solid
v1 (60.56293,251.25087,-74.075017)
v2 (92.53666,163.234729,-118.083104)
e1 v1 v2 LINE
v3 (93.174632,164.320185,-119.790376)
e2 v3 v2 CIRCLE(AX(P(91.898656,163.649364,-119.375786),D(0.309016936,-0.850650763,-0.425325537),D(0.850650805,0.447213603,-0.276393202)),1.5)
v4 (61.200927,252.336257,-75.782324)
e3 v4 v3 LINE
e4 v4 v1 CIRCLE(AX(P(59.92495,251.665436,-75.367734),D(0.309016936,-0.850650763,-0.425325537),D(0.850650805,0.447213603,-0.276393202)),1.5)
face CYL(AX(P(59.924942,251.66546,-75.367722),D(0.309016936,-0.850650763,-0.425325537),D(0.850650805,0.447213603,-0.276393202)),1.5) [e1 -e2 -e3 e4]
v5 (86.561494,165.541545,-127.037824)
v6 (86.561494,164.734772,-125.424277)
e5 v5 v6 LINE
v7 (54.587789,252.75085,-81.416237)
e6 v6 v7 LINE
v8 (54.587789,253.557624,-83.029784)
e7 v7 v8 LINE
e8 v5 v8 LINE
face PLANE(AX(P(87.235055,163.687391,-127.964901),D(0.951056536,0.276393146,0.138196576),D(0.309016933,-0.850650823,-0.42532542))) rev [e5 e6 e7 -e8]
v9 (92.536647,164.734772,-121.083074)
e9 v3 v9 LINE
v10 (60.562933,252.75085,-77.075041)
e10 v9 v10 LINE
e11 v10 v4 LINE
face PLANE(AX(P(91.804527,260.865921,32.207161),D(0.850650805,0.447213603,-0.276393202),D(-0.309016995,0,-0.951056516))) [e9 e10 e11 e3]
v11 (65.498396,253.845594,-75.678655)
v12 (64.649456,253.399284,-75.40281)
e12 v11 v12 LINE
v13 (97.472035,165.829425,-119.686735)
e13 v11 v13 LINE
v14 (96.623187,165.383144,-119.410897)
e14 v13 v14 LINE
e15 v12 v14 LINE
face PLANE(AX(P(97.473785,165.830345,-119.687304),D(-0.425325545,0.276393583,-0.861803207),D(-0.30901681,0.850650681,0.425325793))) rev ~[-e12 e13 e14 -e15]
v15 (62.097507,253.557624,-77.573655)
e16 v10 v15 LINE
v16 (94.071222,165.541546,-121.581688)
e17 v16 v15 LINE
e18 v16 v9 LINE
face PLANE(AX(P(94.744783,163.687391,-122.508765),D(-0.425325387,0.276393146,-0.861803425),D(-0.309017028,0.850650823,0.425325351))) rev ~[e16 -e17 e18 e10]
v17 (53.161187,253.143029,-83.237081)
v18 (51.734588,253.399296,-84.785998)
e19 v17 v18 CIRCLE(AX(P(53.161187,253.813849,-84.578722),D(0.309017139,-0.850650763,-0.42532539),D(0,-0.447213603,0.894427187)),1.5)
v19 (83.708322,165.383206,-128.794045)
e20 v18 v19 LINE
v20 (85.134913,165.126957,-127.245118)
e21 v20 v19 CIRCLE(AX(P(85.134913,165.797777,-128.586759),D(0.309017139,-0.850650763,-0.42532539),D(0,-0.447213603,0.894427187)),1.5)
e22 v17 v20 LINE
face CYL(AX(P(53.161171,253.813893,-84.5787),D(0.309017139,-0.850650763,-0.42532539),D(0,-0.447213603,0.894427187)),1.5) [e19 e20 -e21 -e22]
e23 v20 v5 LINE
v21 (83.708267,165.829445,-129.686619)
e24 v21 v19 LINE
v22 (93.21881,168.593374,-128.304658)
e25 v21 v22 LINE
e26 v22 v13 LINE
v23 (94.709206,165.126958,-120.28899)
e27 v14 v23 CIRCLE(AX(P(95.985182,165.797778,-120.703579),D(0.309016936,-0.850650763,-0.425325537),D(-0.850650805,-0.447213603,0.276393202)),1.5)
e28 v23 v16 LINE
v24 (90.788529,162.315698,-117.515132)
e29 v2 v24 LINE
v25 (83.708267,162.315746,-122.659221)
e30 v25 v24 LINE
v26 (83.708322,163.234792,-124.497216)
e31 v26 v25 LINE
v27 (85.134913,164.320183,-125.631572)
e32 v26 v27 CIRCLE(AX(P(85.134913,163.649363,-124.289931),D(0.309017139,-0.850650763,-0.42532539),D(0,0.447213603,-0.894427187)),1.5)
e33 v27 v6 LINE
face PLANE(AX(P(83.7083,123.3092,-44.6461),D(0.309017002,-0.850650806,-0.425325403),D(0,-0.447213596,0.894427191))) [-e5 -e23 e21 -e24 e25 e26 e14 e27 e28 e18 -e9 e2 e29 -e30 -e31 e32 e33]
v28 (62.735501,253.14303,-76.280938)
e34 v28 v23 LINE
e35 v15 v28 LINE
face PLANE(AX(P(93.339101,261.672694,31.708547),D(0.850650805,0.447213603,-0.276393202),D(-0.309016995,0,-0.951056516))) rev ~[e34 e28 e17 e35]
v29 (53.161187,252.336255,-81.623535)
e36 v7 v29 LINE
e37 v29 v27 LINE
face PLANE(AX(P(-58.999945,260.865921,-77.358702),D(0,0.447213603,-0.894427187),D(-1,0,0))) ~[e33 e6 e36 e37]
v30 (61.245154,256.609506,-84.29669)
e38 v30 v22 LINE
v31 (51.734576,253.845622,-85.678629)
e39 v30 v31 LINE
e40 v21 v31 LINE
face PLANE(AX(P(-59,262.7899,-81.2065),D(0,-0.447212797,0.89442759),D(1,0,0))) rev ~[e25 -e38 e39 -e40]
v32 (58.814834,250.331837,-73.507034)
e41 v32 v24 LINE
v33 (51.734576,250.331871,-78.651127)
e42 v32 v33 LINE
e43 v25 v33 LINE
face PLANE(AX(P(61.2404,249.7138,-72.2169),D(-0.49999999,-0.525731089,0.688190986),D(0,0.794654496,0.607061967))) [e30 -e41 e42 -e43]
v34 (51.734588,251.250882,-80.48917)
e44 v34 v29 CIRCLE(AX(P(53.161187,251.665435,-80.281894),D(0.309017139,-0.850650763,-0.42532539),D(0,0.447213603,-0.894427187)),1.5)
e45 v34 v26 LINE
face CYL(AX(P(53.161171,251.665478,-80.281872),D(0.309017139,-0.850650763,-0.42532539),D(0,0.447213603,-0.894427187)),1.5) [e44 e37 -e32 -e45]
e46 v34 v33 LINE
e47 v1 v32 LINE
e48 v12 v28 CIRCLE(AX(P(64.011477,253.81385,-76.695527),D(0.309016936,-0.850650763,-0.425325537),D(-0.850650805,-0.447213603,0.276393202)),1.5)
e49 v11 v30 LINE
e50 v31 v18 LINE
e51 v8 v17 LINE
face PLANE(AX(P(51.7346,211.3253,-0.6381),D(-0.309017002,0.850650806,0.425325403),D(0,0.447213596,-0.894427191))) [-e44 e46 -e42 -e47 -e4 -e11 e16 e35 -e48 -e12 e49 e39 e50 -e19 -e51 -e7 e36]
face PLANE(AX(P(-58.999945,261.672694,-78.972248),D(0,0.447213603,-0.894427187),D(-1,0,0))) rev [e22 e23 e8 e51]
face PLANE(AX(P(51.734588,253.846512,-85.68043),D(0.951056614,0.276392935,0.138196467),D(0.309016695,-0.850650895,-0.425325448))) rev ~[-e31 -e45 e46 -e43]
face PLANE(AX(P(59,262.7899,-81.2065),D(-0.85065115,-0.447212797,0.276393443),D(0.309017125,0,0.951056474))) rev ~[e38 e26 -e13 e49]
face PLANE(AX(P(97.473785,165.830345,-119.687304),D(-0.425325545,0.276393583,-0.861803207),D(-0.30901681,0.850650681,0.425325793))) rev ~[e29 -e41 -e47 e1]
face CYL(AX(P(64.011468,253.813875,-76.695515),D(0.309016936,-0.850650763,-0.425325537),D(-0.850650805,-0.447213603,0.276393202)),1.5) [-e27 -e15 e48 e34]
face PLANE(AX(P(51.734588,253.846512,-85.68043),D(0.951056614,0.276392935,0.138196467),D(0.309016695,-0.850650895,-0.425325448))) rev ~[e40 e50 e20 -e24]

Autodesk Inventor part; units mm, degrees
sketch "Boceto2" plane through (0, 0, 0) normal (0, 1, 0) x (-1, 0, 0)
  line L0 (0, -100.3768) -> (-95.464, -31.0181)
  line L1 (-95.464, -31.0181) -> (-59, 81.2065)
  line L2 (-59, 81.2065) -> (59, 81.2065)
  line L3 (59, 81.2065) -> (95.464, -31.0181)
  line L4 (95.464, -31.0181) -> (0, -100.3768)
  line L5 (0, 0) -> (162.4131, 0) construction
  line L6 (162.4131, 0) -> (162.4131, 162.4131) construction
  line L7 (162.4131, 162.4131) -> (0, 162.4131) construction
  line L8 (0, 162.4131) -> (0, 0) construction
  line L9 (162.4131, 162.4131) -> (0, 81.2065) construction
  dimension "Lado" = 118
  dimension "d1" = 26.565
  dimension "d2" = 262.7899
extrude "Extrusión1" add sketch "Boceto2" along normal blind 262.7899 draft 26.565
sketch "Boceto3" plane through (0, 262.7899, 0) normal (0, 1, 0) x (1, 0, 0)
  line L0 (0, -100.3768) -> (-95.464, -31.0181)
  line L1 (-95.464, -31.0181) -> (-59, 81.2065)
  line L2 (-59, 81.2065) -> (59, 81.2065)
  line L3 (59, 81.2065) -> (95.464, -31.0181)
  line L4 (95.464, -31.0181) -> (0, -100.3768)
  point P0 (0, 0)
  point P1 (0, 0)
  dimension "d5" = 118
extrude "Extrusión2" cut sketch "Boceto3" against normal blind 262.7899 draft 26.565 keep common part
sketch "Boceto4" plane through (-95.464, 262.7899, 31.0181) normal (-0.5257311, 0.4472136, 0.7236068) x (0.809017, 0, 0.5877853)
  line L0 (-36.464, -112.2247) -> (59, -181.5833) projected
  line L1 (59, -181.5833) -> (154.464, -112.2247) projected
  line L2 (118, 0) -> (154.464, -112.2247) projected
  line L3 (118, 0) -> (0, 0) projected
  line L4 (0, 0) -> (-36.464, -112.2247) projected
  line L5 (59, -167.9866) -> (-23.5327, -108.023)
  line L6 (-23.5327, -108.023) -> (7.992, -11)
  line L7 (7.992, -11) -> (110.008, -11)
  line L8 (110.008, -11) -> (141.5327, -108.023)
  line L9 (141.5327, -108.023) -> (59, -167.9866)
  point P0 (59, -198.7297)
  dimension "Ancho_Marco" = 11
extrude "Extrusión3" cut sketch "Boceto4" against normal blind 162.7899 contours L5 L6 L7 L8 L9
sketch "Boceto5" plane through (-59, 0, 81.2065) normal (0, -0.4472136, 0.8944272) x (1, 0, 0)
  line L0 (-36.464, 112.2247) -> (59, 181.5833) projected
  line L1 (0, 0) -> (-36.464, 112.2247) projected
  line L2 (0, 0) -> (118, 0) projected
  line L3 (118, 0) -> (154.464, 112.2247) projected
  line L4 (59, 181.5833) -> (154.464, 112.2247) projected
  line L5 (-23.5327, 108.023) -> (59, 167.9866)
  line L6 (59, 167.9866) -> (141.5327, 108.023)
  line L7 (141.5327, 108.023) -> (110.008, 11)
  line L8 (110.008, 11) -> (7.992, 11)
  line L9 (7.992, 11) -> (-23.5327, 108.023)
  point P0 (59, -36.3167)
  dimension "d11" = 11
sketch "Boceto6" plane through (-95.464, 0, -31.0181) normal (-0.8506508, -0.4472136, 0.2763932) x (0.309017, 0, 0.9510565)
  line L0 (-36.464, 112.2247) -> (59, 181.5833) projected
  line L1 (0, 0) -> (-36.464, 112.2247) projected
  line L2 (0, 0) -> (118, 0) projected
  line L3 (118, 0) -> (154.464, 112.2247) projected
  line L4 (59, 181.5833) -> (154.464, 112.2247) projected
  line L5 (-23.5327, 108.023) -> (59, 167.9866)
  line L6 (59, 167.9866) -> (141.5327, 108.023)
  line L7 (141.5327, 108.023) -> (110.008, 11)
  line L8 (110.008, 11) -> (7.992, 11)
  line L9 (7.992, 11) -> (-23.5327, 108.023)
  point P0 (59, -36.3167)
  dimension "d12" = 11
sketch "Boceto7" plane through (-59, 262.7899, -81.2065) normal (-0.8506508, 0.4472136, -0.2763932) x (-0.309017, 0, 0.9510565)
  line L0 (-36.464, -112.2247) -> (59, -181.5833) projected
  line L1 (59, -181.5833) -> (154.464, -112.2247) projected
  line L2 (118, 0) -> (154.464, -112.2247) projected
  line L3 (118, 0) -> (0, 0) projected
  line L4 (0, 0) -> (-36.464, -112.2247) projected
  line L5 (59, -167.9866) -> (-23.5327, -108.023)
  line L6 (-23.5327, -108.023) -> (7.992, -11)
  line L7 (7.992, -11) -> (110.008, -11)
  line L8 (110.008, -11) -> (141.5327, -108.023)
  line L9 (141.5327, -108.023) -> (59, -167.9866)
  point P0 (59, -198.7297)
  dimension "d13" = 11
sketch "Boceto8" plane through (0, 262.7899, 0) normal (0, 1, 0) x (1, 0, 0)
  line L0 (-59, 81.2065) -> (59, 81.2065) projected
  line L1 (-95.464, -31.0181) -> (-59, 81.2065) projected
  line L2 (0, -100.3768) -> (-95.464, -31.0181) projected
  line L3 (95.464, -31.0181) -> (0, -100.3768) projected
  line L4 (59, 81.2065) -> (95.464, -31.0181) projected
  line L5 (-82.5327, -26.8165) -> (-51.008, 70.2065)
  line L6 (-51.008, 70.2065) -> (51.008, 70.2065)
  line L7 (51.008, 70.2065) -> (82.5327, -26.8165)
  line L8 (82.5327, -26.8165) -> (0, -86.78)
  line L9 (0, -86.78) -> (-82.5327, -26.8165)
  point P0 (0, 0)
  dimension "d14" = 11
sketch "Boceto9" plane through (0, 262.7899, 100.3768) normal (0.5257311, 0.4472136, 0.7236068) x (0.809017, 0, -0.5877853)
  line L0 (-36.464, -112.2247) -> (59, -181.5833) projected
  line L1 (59, -181.5833) -> (154.464, -112.2247) projected
  line L2 (118, 0) -> (154.464, -112.2247) projected
  line L3 (118, 0) -> (0, 0) projected
  line L4 (0, 0) -> (-36.464, -112.2247) projected
  line L5 (7.992, -11) -> (110.008, -11)
  line L6 (110.008, -11) -> (141.5327, -108.023)
  line L7 (141.5327, -108.023) -> (59, -167.9866)
  line L8 (59, -167.9866) -> (-23.5327, -108.023)
  line L9 (-23.5327, -108.023) -> (7.992, -11)
  point P0 (59, -198.7297)
  dimension "d15" = 11
extrude "Extrusión4" cut sketch "Boceto7" against normal blind 162.7899 contours L5 L6 L7 L8 L9
extrude "Extrusión5" cut sketch "Boceto8" against normal blind 162.7899 contours L5 L6 L7 L8 L9
extrude "Extrusión6" cut sketch "Boceto9" against normal blind 162.7899 contours L5 L6 L7 L8 L9
extrude "Extrusión7" cut sketch "Boceto5" against normal blind 162.7899 contours L5 L6 L7 L8 L9
extrude "Extrusión8" cut sketch "Boceto6" against normal blind 162.7899 contours L5 L6 L7 L8 L9
sketch "Boceto10" plane through (59, 0, 81.2065) normal (0.8506508, -0.4472136, 0.2763932) x (0.309017, 0, -0.9510565)
  line L0 (59, 181.5833) -> (154.464, 112.2247) projected
  line L1 (-36.464, 112.2247) -> (59, 181.5833) projected
  line L2 (0, 0) -> (-36.464, 112.2247) projected
  line L3 (0, 0) -> (118, 0) projected
  line L4 (118, 0) -> (154.464, 112.2247) projected
  line L5 (-23.5327, 108.023) -> (59, 167.9866)
  line L6 (59, 167.9866) -> (141.5327, 108.023)
  line L7 (141.5327, 108.023) -> (110.008, 11)
  line L8 (110.008, 11) -> (7.992, 11)
  line L9 (7.992, 11) -> (-23.5327, 108.023)
  point P0 (59, -36.3167)
  dimension "d26" = 11
sketch "Boceto11" plane through (0, 0, 0) normal (0, -1, 0) x (1, 0, 0)
  line L0 (-59, 81.2065) -> (59, 81.2065) projected
  line L1 (-82.5327, 26.8165) -> (0, 86.78) projected
  line L2 (-95.464, -31.0181) -> (-59, 81.2065) projected
  line L3 (0, -100.3768) -> (-95.464, -31.0181) projected
  line L4 (95.464, -31.0181) -> (0, -100.3768) projected
  line L5 (59, 81.2065) -> (95.464, -31.0181) projected
  line L6 (-59, 81.2065) -> (59, 81.2065) projected
  line L7 (-51.008, 70.2065) -> (-82.5327, -26.8165)
  line L8 (-82.5327, -26.8165) -> (0, -86.78)
  line L9 (0, -86.78) -> (82.5327, -26.8165)
  line L10 (82.5327, -26.8165) -> (51.008, 70.2065)
  line L11 (51.008, 70.2065) -> (-51.008, 70.2065)
  point P0 (0, 0)
  point P1 (-22.8115, 70.2065)
  point P2 (-59.7212, 43.39)
  dimension "d27" = 11
sketch "Boceto12" plane through (0, 0, -100.3768) normal (-0.5257311, -0.4472136, -0.7236068) x (-0.809017, 0, 0.5877853)
  line L0 (78.4833, 87.5371) -> (69.2036, 84.5219) projected
  line L1 (59, 181.5833) -> (154.464, 112.2247) projected
  line L2 (-36.464, 112.2247) -> (59, 181.5833) projected
  line L3 (0, 0) -> (-36.464, 112.2247) projected
  line L4 (0, 0) -> (118, 0) projected
  line L5 (118, 0) -> (154.464, 112.2247) projected
  line L6 (141.5327, 108.023) -> (59, 167.9866)
  line L7 (59, 167.9866) -> (-23.5327, 108.023)
  line L8 (-23.5327, 108.023) -> (7.992, 11)
  line L9 (7.992, 11) -> (110.008, 11)
  line L10 (110.008, 11) -> (141.5327, 108.023)
  point P0 (59, -36.3167)
  point P1 (59, 91.9353)
  point P2 (69, 94.9704)
  point P3 (69.2036, 84.5219)
  dimension "d28" = 11
sketch "Boceto13" plane through (59, 262.7899, -81.2065) normal (0, 0.4472136, -0.8944272) x (-1, 0, 0)
  line L0 (59, -181.5833) -> (154.464, -112.2247) projected
  line L1 (118, 0) -> (154.464, -112.2247) projected
  line L2 (118, 0) -> (0, 0) projected
  line L3 (0, 0) -> (-36.464, -112.2247) projected
  line L4 (-36.464, -112.2247) -> (59, -181.5833) projected
  line L5 (141.5327, -108.023) -> (59, -167.9866)
  line L6 (59, -167.9866) -> (-23.5327, -108.023)
  line L7 (-23.5327, -108.023) -> (7.992, -11)
  line L8 (7.992, -11) -> (110.008, -11)
  line L9 (110.008, -11) -> (141.5327, -108.023)
  point P0 (59, -198.7297)
  dimension "d29" = 11
sketch "Boceto14" plane through (95.464, 262.7899, 31.0181) normal (0.8506508, 0.4472136, -0.2763932) x (-0.309017, 0, -0.9510565)
  line L0 (59, -181.5833) -> (154.464, -112.2247) projected
  line L1 (118, 0) -> (154.464, -112.2247) projected
  line L2 (118, 0) -> (0, 0) projected
  line L3 (0, 0) -> (-36.464, -112.2247) projected
  line L4 (-36.464, -112.2247) -> (59, -181.5833) projected
  line L5 (141.5327, -108.023) -> (59, -167.9866)
  line L6 (59, -167.9866) -> (-23.5327, -108.023)
  line L7 (-23.5327, -108.023) -> (7.992, -11)
  line L8 (7.992, -11) -> (110.008, -11)
  line L9 (110.008, -11) -> (141.5327, -108.023)
  point P0 (59, -198.7297)
  dimension "d30" = 11
sketch "Boceto15" plane through (95.464, 0, -31.0181) normal (0.5257311, -0.4472136, -0.7236068) x (-0.809017, 0, -0.5877853)
  line L0 (59, 181.5833) -> (154.464, 112.2247) projected
  line L1 (-36.464, 112.2247) -> (59, 181.5833) projected
  line L2 (0, 0) -> (-36.464, 112.2247) projected
  line L3 (0, 0) -> (118, 0) projected
  line L4 (118, 0) -> (154.464, 112.2247) projected
  line L5 (141.5327, 108.023) -> (59, 167.9866)
  line L6 (59, 167.9866) -> (-23.5327, 108.023)
  line L7 (-23.5327, 108.023) -> (7.992, 11)
  line L8 (7.992, 11) -> (110.008, 11)
  line L9 (110.008, 11) -> (141.5327, 108.023)
  point P0 (59, -36.3167)
  dimension "d31" = 11
extrude "Extrusión9" cut sketch "Boceto13" against normal blind 162.7899 contours L5 L6 L7 L8 L9
extrude "Extrusión10" cut sketch "Boceto15" against normal blind 162.7899 contours L9 L8 L7 L6 L5
extrude "Extrusión11" cut sketch "Boceto14" against normal blind 162.7899 contours L5 L6 L7 L8 L9
extrude "Extrusión12" cut sketch "Boceto12" against normal blind 162.7899 contours L10 L9 L8 L7 L6
extrude "Extrusión13" cut sketch "Boceto11" against normal blind 162.7899 contours L11 L10 L9 L8 L7 L1 | L1 L7 L11
extrude "Extrusión14" cut sketch "Boceto10" against normal blind 162.7899 contours L5 L6 L7 L8 L9
ref_plane "Plano de trabajo1" through (93.3374, 261.6718, 31.7091) normal (0.8506508, 0.4472136, -0.2763932) x (-0.309017, 0, -0.9510565)
sketch "Boceto17" plane through (93.3374, 261.6718, 31.7091) normal (0.8506508, 0.4472136, -0.2763932) x (-0.309017, 0, -0.9510565)
  line L0 (-23.5327, -108.023) -> (7.992, -11) projected
  line L1 (7.992, -11) -> (110.008, -11) projected
  line L2 (110.008, -11) -> (141.5327, -108.023) projected
  line L3 (141.5327, -108.023) -> (59, -167.9866) projected
  line L4 (59, -167.9866) -> (-23.5327, -108.023) projected
  line L5 (59, -181.5833) -> (154.464, -112.2247) projected
  line L6 (118, 0) -> (154.464, -112.2247) projected
  line L7 (118, 0) -> (0, 0) projected
  line L8 (0, 0) -> (-36.464, -112.2247) projected
  line L9 (-36.464, -112.2247) -> (59, -181.5833) projected
  line L10 (59, -172.9309) -> (146.235, -109.5509)
  line L11 (146.235, -109.5509) -> (112.9142, -7)
  line L12 (112.9142, -7) -> (5.0858, -7)
  line L13 (5.0858, -7) -> (-28.235, -109.5509)
  line L14 (-28.235, -109.5509) -> (59, -172.9309)
  point P0 (59, -198.7297)
  dimension "d48" = 4
extrude "Extrusión15" cut sketch "Boceto17" against normal blind 1.8 contours L14 L13 L12 L11 L10
ref_plane "Plano de trabajo4" through (61.2404, 249.7138, -72.2169) normal (0.5, 0.5257311, -0.688191) x (0.309017, -0.8506508, -0.4253254)
ref_plane "Plano de trabajo3" through (62.4904, 251.0281, -73.9374) normal (0.5, 0.5257311, -0.688191) x (0.309017, -0.8506508, -0.4253254)
ref_plane "Plano de trabajo5" through (97.6729, 166.1711, -118.5159) normal (0.5, -0.8506508, 0.1624598) x (-0.8506508, -0.4472136, 0.2763932)
ref_plane "Plano de trabajo6" through (82.5327, 166.1711, -129.5159) normal (-0.309017, -0.8506508, -0.4253254) x (0, -0.4472136, 0.8944272)
split "Dividir2" plane through (97.6729, 166.1711, -118.5159) removes the side toward (0.5, -0.8506508, 0.1624598)
split "Dividir3" plane through (82.5327, 166.1711, -129.5159) removes the side toward (-0.309017, -0.8506508, -0.4253254)
ref_plane "Plano de trabajo7" through (66.1482, 252.9512, -75.1259) normal (0, 0.5257311, 0.8506508) x (-0.8506508, -0.4472136, 0.2763932)
ref_plane "Plano de trabajo8" through (51.008, 252.9512, -86.1259) normal (-0.809017, 0.5257311, 0.2628656) x (0, -0.4472136, 0.8944272)
split "Dividir4" plane through (66.1482, 252.9512, -75.1259) removes the side toward (0, 0.5257311, 0.8506508)
split "Dividir5" plane through (51.008, 252.9512, -86.1259) removes the side toward (-0.809017, 0.5257311, 0.2628656)
split "Dividir6" plane through (61.2404, 249.7138, -72.2169) removes the side toward (-0.5, -0.5257311, 0.688191)
ref_plane "Plano de trabajo9" through (-14.2309, 126.771, 19.5872) normal (-0.809017, 0, -0.5877853) x (0.5773503, 0.1875925, -0.7946545)
mirror "Simetría1" about plane through (-14.2309, 126.771, 19.5872) normal (-0.809017, 0, -0.5877853) of "Extrusión15"
sketch "Boceto19" plane through (91.5151, 162.9338, -116.5151) normal (-0.5, -0.5257311, 0.688191) x (0.809017, 0, 0.5877853)
  line L0 (-5.5514, -3.431) -> (-11.1029, 0) projected
  line L1 (0, 0) -> (-5.5514, -3.431) projected
  line L2 (0, 102.0161) -> (0, 0) projected
  line L3 (-5.5514, 105.447) -> (0, 102.0161) projected
  line L4 (-11.1029, 102.0161) -> (-5.5514, 105.447) projected
  line L5 (-11.1029, 0) -> (-11.1029, 102.0161) projected
  point P0 (-5.5514, -60.7632)
  dimension "d54" = 11.1029
  dimension "d55" = 102.0161
sketch "Boceto20" plane through (91.8062, 260.8668, 32.2066) normal (0.8506508, 0.4472136, -0.2763932) x (-0.309017, 0, -0.9510565)
  line L0 (112.9142, -7) -> (110.008, -11) projected
  line L1 (141.5327, -108.023) -> (110.008, -11) projected
  line L2 (141.5327, -108.023) -> (146.235, -109.5509) projected
  line L3 (112.9142, -7) -> (146.235, -109.5509) projected
  point P0 (59, -198.7297)
fillet "Empalme1" radius 1 4 edges at (79.7857, 208.444, -96.1305) (78.2511, 207.6372, -95.6319) (66.7704, 208.444, -105.5866) (66.7704, 207.6372, -103.9731)
sketch "Boceto21" plane through (95.464, 162.4131, -131.3949) normal (0, 0.4472136, -0.8944272) x (-0.9510565, 0.2763932, 0.1381966)
  line L0 (69.3587, 95.464) -> (0, 0) projected
  line L1 (73.5603, 82.5327) -> (69.3587, 95.464) projected
  line L2 (69.3587, 95.464) -> (0, 0) projected
  line L3 (0, 0) -> (13.5967, 0) projected
  line L4 (13.5967, 0) -> (73.5603, 82.5327) projected
  line L5 (13.5967, 0) -> (7.992, 11)
  line L6 (13.5967, 0) -> (25.9423, 0) construction
  point P0 (64.0601, -111.7712)
  dimension "d63" = 126
  dimension "d64" = 117
sketch "Boceto22" plane through (97.6729, 166.1711, -118.5159) normal (0.8506508, 0.4472136, -0.2763932) x (-0.1624598, -0.2763932, -0.9472136)
  line L0 (-55.7619, 95.464) -> (-59.9635, 82.5327) projected
  line L1 (-59.9635, 82.5327) -> (0, 0) projected
  line L2 (0, 0) -> (13.5967, 0) projected
  line L3 (-55.7619, 95.464) -> (13.5967, 0) projected
  line L4 (-59.9635, 82.5327) -> (0, 0) projected
  line L5 (1.2361, 0) -> (-59.5816, 83.7083) projected
  point P0 (-50.4634, -111.7712)
  dimension "d65" = 11
sketch "Boceto23" plane through (93.2119, 162.8815, -122.0107) normal (0.5, -0.8506508, 0.1624598) x (0.8506508, 0.4472136, -0.2763932)
  ellipse E0 centre (-1, 3.7082) end of major axis (-1, 4.9443) minor radius 1 (0, 3.7082) -> (-1, 4.9443) ccw projected
  line L0 (-1, 4.9443) -> (-2.9389, 4.9443) projected
  line L1 (-2.9389, 4.9443) -> (-5.8575, -0.8928) projected
  line L2 (-5.8575, -0.8928) -> (4.3, -8.6525) projected
  line L3 (4.3, 4.9443) -> (4.3, -8.6525) projected
  line L4 (4.3, 4.9443) -> (2.8, 4.9443) projected
  ellipse E1 centre (2.8, 3.7082) end of major axis (2.8, 4.9443) minor radius 1 (2.8, 4.9443) -> (1.8, 3.7082) ccw projected
  line L5 (1.8, 0) -> (1.8, 3.7082) projected
  line L6 (1.8, 0) -> (0, 0) projected
  line L7 (0, 3.7082) -> (0, 0) projected
  line L8 (1.8, 0) -> (1.8, 4.9443)
  point P0 (-185.8565, 55.4077)
  dimension "d67" = 4.9443
extrude "Extrusión16" cut sketch "Boceto22" against normal blind 10 contours L5 L2 L1 L0
sketch "Boceto24" plane through (95.464, 162.4131, -131.3949) normal (0, 0.4472136, -0.8944272) x (-0.9510565, 0.2763932, 0.1381966)
  line L0 (73.5603, 82.5327) -> (69.3587, 95.464) projected
  line L1 (69.3587, 95.464) -> (0, 0) projected
  line L2 (0, 0) -> (13.5967, 0) projected
  line L3 (13.5967, 0) -> (73.5603, 82.5327) projected
  line L4 (13.5967, 0) -> (73.5603, 82.5327) projected
  line L5 (13.5967, 0) -> (73.5603, 82.5327) projected
  line L6 (73.1783, 83.7083) -> (12.3607, 0) projected
  point P0 (64.0601, -111.7712)
extrude "Extrusión17" cut sketch "Boceto24" against normal blind 10 contours L3 L2 L6 L0
fillet "Empalme2" radius 1.5 2 edges at (67.7214, 208.7204, -105.4484) (67.7214, 207.9136, -103.8349)
fillet "Empalme3" radius 1.5 2 edges at (77.8258, 207.9136, -96.4937) (79.3603, 208.7204, -96.9923)
ref_plane "Plano de trabajo11" through (51.7346, 211.3253, -0.6381) normal (-0.309017, 0.8506508, 0.4253254) x (0, -0.4472136, 0.8944272)
split "Dividir7" plane through (51.7346, 211.3253, -0.6381) removes the side toward (-0.309017, 0.8506508, 0.4253254)
ref_plane "Plano de trabajo12" through (83.7083, 123.3092, -44.6461) normal (-0.309017, 0.8506508, 0.4253254) x (0, 0.4472136, -0.8944272)
split "Dividir8" plane through (83.7083, 123.3092, -44.6461) removes the side toward (0.309017, -0.8506508, -0.4253254)
ref_plane "Plano de trabajo2" through (59.2794, 271.8594, -65.6718) normal (0.5, 0.5257311, -0.688191) x (0.309017, -0.8506508, -0.4253254)
equation "\"d3\" = d2"
equation "\"d4\" = d1"
equation "\"d5\" = Lado"
equation "\"d6\" = d2"
equation "\"d7\" = d1"
equation "\"d11\" = Ancho_Marco"
equation "\"d12\" = Ancho_Marco"
equation "\"d13\" = Ancho_Marco"
equation "\"d14\" = Ancho_Marco"
equation "\"d15\" = Ancho_Marco"
equation "\"d26\" = Ancho_Marco"
equation "\"d27\" = Ancho_Marco"
equation "\"d28\" = Ancho_Marco"
equation "\"d29\" = Ancho_Marco"
equation "\"d30\" = Ancho_Marco"
equation "\"d31\" = Ancho_Marco"
properties part number "Perfil_V3"
